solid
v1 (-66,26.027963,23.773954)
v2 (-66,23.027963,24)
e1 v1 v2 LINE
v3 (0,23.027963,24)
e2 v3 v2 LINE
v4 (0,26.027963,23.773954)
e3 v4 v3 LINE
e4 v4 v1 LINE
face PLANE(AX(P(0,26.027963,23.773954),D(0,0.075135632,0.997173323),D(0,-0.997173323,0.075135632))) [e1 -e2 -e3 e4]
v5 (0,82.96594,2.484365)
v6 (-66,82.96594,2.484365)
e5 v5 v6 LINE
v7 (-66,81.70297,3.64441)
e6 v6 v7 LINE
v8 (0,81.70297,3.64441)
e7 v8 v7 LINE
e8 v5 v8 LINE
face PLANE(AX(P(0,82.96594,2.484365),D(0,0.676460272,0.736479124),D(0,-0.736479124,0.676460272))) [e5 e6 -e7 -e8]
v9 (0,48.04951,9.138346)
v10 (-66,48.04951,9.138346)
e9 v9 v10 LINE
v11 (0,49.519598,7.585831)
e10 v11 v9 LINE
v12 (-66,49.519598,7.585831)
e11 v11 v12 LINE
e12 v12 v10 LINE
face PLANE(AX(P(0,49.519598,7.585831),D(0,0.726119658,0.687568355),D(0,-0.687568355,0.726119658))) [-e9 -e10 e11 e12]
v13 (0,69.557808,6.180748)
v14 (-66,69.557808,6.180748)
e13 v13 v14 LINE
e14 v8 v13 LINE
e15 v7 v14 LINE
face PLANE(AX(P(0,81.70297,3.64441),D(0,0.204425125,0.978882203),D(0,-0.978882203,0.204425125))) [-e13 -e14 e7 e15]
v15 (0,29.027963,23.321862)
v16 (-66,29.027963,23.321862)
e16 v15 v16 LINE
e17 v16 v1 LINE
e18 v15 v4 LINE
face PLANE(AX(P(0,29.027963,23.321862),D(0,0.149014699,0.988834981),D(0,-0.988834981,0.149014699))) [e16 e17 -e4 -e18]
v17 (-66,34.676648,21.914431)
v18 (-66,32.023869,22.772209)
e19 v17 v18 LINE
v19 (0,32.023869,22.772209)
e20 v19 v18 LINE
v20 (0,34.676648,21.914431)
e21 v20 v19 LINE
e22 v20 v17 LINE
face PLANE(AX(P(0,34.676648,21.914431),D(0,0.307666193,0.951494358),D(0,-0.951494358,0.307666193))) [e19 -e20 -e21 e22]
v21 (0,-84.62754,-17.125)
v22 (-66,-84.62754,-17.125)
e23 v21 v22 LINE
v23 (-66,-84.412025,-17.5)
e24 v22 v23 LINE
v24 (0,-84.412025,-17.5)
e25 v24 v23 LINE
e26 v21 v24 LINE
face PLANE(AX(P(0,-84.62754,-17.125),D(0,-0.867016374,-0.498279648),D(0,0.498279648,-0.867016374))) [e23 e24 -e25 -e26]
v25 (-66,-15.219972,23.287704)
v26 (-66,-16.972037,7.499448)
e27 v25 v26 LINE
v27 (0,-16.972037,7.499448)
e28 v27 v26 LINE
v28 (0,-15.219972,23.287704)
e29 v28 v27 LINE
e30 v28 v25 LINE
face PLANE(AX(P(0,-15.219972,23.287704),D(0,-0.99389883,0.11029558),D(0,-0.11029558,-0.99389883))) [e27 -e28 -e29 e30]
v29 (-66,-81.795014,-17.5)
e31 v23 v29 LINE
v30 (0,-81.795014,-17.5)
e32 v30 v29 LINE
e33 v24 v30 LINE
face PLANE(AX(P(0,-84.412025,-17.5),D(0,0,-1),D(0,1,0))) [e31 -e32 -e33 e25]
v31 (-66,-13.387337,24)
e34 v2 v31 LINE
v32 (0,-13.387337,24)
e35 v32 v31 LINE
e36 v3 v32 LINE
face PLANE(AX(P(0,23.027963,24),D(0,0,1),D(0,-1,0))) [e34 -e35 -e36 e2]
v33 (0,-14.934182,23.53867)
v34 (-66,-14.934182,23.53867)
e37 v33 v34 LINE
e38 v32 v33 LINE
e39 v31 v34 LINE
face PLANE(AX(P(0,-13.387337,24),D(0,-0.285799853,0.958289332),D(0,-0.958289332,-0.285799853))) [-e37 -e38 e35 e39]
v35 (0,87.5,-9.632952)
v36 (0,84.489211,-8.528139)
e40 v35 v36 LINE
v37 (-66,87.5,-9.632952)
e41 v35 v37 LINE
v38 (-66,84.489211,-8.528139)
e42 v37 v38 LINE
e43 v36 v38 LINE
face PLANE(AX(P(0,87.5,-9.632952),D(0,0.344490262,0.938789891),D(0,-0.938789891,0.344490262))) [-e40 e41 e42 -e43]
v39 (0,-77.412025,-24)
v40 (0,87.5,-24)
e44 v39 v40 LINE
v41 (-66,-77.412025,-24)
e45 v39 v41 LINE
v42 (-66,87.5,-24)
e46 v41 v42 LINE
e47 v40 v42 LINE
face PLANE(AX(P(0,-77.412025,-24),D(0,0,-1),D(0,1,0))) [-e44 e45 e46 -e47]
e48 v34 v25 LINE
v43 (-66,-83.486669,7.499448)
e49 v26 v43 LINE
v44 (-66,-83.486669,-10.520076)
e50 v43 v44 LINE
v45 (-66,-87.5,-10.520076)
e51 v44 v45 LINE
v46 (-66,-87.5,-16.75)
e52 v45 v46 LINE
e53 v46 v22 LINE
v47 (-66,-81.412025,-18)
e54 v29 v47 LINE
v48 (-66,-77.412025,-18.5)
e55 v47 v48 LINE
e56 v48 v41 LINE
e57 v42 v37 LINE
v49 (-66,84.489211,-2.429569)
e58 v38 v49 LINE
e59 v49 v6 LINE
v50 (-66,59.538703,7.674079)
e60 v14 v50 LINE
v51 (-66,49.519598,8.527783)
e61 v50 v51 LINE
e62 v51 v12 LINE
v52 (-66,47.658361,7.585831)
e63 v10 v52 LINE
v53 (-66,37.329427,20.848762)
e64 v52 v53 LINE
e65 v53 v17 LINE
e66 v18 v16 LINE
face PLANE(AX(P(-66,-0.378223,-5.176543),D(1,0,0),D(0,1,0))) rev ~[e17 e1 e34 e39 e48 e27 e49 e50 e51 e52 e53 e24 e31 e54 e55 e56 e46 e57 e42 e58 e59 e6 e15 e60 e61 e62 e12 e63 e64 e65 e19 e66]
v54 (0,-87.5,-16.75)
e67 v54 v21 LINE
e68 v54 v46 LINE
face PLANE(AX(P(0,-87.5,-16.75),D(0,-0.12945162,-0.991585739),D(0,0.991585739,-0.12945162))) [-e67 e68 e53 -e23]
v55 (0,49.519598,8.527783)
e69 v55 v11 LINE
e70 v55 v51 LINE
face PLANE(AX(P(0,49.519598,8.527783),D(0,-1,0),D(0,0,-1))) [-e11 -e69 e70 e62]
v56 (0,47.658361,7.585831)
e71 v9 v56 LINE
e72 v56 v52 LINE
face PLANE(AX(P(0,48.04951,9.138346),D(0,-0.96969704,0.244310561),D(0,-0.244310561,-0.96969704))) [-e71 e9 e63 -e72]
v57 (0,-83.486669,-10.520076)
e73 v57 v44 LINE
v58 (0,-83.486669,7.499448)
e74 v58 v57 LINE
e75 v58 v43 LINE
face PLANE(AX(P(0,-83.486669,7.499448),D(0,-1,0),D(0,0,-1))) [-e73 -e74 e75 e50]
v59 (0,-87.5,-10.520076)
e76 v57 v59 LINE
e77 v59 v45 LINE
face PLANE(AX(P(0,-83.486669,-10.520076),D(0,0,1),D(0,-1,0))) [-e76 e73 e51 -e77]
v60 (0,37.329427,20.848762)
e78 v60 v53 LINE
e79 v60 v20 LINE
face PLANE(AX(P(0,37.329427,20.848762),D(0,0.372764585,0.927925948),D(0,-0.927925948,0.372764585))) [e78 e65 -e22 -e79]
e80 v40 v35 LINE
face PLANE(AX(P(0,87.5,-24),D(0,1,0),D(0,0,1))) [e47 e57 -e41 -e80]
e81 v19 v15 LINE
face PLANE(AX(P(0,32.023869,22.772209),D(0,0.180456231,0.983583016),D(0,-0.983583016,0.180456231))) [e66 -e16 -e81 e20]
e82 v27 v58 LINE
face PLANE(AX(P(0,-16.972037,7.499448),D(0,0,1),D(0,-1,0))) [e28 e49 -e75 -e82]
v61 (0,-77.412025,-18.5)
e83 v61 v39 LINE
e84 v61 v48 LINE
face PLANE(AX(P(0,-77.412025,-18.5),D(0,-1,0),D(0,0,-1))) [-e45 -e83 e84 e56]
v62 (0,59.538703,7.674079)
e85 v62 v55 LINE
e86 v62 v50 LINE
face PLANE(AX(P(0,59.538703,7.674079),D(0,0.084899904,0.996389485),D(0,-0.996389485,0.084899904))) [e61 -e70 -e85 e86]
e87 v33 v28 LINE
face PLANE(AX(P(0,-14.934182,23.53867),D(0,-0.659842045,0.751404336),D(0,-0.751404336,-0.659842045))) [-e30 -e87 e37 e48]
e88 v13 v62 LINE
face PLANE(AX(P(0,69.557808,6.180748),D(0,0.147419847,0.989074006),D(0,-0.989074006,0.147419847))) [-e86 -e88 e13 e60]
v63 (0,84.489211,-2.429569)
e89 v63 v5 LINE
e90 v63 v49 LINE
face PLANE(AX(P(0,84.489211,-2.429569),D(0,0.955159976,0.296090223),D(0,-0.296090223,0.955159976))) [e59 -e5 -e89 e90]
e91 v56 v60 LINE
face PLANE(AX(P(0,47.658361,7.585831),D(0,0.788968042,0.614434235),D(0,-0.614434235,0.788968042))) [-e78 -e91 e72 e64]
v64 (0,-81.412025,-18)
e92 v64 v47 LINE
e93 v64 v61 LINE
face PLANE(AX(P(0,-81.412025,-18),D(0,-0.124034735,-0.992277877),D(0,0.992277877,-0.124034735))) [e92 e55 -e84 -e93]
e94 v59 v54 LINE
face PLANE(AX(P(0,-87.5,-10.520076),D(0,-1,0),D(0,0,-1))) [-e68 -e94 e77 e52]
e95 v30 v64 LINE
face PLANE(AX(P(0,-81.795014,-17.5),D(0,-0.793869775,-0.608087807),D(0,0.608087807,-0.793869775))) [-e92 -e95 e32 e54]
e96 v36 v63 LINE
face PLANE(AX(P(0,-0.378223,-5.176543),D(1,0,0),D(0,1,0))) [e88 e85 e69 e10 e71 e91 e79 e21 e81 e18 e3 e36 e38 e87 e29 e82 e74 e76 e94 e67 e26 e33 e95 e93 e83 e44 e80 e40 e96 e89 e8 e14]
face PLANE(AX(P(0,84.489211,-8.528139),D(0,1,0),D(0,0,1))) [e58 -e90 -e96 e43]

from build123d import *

# Parameters (mm, degrees)
F1_DEPTH = 66


# Not quite as in the source:
# - a feature names something its author has since deleted; it is built from what else it names


with BuildPart() as f1:
    # F0 (on Right) → F1 (new body)
    with BuildSketch(Plane.YZ):
        Polygon((-77.412024796, -18.5), (-77.412024796, -24), (87.5, -24), (87.5, -9.63295158), (84.4892114401, -8.5281385109), (84.4892114401, -2.4295686744), (82.965940237, 2.4843649007), (81.7029699683, 3.644410288), (69.5578083396, 6.1807483435), (59.5387034118, 7.6740793884), (49.519598484, 8.5277827457), (49.519598484, 7.9152721193), (49.519598484, 7.5858309865), (48.0495102024, 9.1383457184), (47.6583614945, 7.5858309865), (37.3294272488, 20.848762244), (34.6766483518, 21.9144313596), (32.0238694549, 22.7722087875), (29.0279629678, 23.3218624368), (26.0279629678, 23.7739541456), (23.0279629678, 24), (-13.387337327, 24), (-14.9341821671, 23.5386695713), (-15.2199724689, 23.2877042145), (-16.9720370322, 7.4994475581), (-83.4866687655, 7.4994475581), (-83.4866687655, -10.5200763792), (-87.5, -10.5200763792), (-87.5, -16.75), (-84.6275396049, -17.125), (-84.412024796, -17.5), (-81.795014441, -17.5), (-81.412024796, -18), align=None)
    extrude(amount=-F1_DEPTH)


solid = f1.part
